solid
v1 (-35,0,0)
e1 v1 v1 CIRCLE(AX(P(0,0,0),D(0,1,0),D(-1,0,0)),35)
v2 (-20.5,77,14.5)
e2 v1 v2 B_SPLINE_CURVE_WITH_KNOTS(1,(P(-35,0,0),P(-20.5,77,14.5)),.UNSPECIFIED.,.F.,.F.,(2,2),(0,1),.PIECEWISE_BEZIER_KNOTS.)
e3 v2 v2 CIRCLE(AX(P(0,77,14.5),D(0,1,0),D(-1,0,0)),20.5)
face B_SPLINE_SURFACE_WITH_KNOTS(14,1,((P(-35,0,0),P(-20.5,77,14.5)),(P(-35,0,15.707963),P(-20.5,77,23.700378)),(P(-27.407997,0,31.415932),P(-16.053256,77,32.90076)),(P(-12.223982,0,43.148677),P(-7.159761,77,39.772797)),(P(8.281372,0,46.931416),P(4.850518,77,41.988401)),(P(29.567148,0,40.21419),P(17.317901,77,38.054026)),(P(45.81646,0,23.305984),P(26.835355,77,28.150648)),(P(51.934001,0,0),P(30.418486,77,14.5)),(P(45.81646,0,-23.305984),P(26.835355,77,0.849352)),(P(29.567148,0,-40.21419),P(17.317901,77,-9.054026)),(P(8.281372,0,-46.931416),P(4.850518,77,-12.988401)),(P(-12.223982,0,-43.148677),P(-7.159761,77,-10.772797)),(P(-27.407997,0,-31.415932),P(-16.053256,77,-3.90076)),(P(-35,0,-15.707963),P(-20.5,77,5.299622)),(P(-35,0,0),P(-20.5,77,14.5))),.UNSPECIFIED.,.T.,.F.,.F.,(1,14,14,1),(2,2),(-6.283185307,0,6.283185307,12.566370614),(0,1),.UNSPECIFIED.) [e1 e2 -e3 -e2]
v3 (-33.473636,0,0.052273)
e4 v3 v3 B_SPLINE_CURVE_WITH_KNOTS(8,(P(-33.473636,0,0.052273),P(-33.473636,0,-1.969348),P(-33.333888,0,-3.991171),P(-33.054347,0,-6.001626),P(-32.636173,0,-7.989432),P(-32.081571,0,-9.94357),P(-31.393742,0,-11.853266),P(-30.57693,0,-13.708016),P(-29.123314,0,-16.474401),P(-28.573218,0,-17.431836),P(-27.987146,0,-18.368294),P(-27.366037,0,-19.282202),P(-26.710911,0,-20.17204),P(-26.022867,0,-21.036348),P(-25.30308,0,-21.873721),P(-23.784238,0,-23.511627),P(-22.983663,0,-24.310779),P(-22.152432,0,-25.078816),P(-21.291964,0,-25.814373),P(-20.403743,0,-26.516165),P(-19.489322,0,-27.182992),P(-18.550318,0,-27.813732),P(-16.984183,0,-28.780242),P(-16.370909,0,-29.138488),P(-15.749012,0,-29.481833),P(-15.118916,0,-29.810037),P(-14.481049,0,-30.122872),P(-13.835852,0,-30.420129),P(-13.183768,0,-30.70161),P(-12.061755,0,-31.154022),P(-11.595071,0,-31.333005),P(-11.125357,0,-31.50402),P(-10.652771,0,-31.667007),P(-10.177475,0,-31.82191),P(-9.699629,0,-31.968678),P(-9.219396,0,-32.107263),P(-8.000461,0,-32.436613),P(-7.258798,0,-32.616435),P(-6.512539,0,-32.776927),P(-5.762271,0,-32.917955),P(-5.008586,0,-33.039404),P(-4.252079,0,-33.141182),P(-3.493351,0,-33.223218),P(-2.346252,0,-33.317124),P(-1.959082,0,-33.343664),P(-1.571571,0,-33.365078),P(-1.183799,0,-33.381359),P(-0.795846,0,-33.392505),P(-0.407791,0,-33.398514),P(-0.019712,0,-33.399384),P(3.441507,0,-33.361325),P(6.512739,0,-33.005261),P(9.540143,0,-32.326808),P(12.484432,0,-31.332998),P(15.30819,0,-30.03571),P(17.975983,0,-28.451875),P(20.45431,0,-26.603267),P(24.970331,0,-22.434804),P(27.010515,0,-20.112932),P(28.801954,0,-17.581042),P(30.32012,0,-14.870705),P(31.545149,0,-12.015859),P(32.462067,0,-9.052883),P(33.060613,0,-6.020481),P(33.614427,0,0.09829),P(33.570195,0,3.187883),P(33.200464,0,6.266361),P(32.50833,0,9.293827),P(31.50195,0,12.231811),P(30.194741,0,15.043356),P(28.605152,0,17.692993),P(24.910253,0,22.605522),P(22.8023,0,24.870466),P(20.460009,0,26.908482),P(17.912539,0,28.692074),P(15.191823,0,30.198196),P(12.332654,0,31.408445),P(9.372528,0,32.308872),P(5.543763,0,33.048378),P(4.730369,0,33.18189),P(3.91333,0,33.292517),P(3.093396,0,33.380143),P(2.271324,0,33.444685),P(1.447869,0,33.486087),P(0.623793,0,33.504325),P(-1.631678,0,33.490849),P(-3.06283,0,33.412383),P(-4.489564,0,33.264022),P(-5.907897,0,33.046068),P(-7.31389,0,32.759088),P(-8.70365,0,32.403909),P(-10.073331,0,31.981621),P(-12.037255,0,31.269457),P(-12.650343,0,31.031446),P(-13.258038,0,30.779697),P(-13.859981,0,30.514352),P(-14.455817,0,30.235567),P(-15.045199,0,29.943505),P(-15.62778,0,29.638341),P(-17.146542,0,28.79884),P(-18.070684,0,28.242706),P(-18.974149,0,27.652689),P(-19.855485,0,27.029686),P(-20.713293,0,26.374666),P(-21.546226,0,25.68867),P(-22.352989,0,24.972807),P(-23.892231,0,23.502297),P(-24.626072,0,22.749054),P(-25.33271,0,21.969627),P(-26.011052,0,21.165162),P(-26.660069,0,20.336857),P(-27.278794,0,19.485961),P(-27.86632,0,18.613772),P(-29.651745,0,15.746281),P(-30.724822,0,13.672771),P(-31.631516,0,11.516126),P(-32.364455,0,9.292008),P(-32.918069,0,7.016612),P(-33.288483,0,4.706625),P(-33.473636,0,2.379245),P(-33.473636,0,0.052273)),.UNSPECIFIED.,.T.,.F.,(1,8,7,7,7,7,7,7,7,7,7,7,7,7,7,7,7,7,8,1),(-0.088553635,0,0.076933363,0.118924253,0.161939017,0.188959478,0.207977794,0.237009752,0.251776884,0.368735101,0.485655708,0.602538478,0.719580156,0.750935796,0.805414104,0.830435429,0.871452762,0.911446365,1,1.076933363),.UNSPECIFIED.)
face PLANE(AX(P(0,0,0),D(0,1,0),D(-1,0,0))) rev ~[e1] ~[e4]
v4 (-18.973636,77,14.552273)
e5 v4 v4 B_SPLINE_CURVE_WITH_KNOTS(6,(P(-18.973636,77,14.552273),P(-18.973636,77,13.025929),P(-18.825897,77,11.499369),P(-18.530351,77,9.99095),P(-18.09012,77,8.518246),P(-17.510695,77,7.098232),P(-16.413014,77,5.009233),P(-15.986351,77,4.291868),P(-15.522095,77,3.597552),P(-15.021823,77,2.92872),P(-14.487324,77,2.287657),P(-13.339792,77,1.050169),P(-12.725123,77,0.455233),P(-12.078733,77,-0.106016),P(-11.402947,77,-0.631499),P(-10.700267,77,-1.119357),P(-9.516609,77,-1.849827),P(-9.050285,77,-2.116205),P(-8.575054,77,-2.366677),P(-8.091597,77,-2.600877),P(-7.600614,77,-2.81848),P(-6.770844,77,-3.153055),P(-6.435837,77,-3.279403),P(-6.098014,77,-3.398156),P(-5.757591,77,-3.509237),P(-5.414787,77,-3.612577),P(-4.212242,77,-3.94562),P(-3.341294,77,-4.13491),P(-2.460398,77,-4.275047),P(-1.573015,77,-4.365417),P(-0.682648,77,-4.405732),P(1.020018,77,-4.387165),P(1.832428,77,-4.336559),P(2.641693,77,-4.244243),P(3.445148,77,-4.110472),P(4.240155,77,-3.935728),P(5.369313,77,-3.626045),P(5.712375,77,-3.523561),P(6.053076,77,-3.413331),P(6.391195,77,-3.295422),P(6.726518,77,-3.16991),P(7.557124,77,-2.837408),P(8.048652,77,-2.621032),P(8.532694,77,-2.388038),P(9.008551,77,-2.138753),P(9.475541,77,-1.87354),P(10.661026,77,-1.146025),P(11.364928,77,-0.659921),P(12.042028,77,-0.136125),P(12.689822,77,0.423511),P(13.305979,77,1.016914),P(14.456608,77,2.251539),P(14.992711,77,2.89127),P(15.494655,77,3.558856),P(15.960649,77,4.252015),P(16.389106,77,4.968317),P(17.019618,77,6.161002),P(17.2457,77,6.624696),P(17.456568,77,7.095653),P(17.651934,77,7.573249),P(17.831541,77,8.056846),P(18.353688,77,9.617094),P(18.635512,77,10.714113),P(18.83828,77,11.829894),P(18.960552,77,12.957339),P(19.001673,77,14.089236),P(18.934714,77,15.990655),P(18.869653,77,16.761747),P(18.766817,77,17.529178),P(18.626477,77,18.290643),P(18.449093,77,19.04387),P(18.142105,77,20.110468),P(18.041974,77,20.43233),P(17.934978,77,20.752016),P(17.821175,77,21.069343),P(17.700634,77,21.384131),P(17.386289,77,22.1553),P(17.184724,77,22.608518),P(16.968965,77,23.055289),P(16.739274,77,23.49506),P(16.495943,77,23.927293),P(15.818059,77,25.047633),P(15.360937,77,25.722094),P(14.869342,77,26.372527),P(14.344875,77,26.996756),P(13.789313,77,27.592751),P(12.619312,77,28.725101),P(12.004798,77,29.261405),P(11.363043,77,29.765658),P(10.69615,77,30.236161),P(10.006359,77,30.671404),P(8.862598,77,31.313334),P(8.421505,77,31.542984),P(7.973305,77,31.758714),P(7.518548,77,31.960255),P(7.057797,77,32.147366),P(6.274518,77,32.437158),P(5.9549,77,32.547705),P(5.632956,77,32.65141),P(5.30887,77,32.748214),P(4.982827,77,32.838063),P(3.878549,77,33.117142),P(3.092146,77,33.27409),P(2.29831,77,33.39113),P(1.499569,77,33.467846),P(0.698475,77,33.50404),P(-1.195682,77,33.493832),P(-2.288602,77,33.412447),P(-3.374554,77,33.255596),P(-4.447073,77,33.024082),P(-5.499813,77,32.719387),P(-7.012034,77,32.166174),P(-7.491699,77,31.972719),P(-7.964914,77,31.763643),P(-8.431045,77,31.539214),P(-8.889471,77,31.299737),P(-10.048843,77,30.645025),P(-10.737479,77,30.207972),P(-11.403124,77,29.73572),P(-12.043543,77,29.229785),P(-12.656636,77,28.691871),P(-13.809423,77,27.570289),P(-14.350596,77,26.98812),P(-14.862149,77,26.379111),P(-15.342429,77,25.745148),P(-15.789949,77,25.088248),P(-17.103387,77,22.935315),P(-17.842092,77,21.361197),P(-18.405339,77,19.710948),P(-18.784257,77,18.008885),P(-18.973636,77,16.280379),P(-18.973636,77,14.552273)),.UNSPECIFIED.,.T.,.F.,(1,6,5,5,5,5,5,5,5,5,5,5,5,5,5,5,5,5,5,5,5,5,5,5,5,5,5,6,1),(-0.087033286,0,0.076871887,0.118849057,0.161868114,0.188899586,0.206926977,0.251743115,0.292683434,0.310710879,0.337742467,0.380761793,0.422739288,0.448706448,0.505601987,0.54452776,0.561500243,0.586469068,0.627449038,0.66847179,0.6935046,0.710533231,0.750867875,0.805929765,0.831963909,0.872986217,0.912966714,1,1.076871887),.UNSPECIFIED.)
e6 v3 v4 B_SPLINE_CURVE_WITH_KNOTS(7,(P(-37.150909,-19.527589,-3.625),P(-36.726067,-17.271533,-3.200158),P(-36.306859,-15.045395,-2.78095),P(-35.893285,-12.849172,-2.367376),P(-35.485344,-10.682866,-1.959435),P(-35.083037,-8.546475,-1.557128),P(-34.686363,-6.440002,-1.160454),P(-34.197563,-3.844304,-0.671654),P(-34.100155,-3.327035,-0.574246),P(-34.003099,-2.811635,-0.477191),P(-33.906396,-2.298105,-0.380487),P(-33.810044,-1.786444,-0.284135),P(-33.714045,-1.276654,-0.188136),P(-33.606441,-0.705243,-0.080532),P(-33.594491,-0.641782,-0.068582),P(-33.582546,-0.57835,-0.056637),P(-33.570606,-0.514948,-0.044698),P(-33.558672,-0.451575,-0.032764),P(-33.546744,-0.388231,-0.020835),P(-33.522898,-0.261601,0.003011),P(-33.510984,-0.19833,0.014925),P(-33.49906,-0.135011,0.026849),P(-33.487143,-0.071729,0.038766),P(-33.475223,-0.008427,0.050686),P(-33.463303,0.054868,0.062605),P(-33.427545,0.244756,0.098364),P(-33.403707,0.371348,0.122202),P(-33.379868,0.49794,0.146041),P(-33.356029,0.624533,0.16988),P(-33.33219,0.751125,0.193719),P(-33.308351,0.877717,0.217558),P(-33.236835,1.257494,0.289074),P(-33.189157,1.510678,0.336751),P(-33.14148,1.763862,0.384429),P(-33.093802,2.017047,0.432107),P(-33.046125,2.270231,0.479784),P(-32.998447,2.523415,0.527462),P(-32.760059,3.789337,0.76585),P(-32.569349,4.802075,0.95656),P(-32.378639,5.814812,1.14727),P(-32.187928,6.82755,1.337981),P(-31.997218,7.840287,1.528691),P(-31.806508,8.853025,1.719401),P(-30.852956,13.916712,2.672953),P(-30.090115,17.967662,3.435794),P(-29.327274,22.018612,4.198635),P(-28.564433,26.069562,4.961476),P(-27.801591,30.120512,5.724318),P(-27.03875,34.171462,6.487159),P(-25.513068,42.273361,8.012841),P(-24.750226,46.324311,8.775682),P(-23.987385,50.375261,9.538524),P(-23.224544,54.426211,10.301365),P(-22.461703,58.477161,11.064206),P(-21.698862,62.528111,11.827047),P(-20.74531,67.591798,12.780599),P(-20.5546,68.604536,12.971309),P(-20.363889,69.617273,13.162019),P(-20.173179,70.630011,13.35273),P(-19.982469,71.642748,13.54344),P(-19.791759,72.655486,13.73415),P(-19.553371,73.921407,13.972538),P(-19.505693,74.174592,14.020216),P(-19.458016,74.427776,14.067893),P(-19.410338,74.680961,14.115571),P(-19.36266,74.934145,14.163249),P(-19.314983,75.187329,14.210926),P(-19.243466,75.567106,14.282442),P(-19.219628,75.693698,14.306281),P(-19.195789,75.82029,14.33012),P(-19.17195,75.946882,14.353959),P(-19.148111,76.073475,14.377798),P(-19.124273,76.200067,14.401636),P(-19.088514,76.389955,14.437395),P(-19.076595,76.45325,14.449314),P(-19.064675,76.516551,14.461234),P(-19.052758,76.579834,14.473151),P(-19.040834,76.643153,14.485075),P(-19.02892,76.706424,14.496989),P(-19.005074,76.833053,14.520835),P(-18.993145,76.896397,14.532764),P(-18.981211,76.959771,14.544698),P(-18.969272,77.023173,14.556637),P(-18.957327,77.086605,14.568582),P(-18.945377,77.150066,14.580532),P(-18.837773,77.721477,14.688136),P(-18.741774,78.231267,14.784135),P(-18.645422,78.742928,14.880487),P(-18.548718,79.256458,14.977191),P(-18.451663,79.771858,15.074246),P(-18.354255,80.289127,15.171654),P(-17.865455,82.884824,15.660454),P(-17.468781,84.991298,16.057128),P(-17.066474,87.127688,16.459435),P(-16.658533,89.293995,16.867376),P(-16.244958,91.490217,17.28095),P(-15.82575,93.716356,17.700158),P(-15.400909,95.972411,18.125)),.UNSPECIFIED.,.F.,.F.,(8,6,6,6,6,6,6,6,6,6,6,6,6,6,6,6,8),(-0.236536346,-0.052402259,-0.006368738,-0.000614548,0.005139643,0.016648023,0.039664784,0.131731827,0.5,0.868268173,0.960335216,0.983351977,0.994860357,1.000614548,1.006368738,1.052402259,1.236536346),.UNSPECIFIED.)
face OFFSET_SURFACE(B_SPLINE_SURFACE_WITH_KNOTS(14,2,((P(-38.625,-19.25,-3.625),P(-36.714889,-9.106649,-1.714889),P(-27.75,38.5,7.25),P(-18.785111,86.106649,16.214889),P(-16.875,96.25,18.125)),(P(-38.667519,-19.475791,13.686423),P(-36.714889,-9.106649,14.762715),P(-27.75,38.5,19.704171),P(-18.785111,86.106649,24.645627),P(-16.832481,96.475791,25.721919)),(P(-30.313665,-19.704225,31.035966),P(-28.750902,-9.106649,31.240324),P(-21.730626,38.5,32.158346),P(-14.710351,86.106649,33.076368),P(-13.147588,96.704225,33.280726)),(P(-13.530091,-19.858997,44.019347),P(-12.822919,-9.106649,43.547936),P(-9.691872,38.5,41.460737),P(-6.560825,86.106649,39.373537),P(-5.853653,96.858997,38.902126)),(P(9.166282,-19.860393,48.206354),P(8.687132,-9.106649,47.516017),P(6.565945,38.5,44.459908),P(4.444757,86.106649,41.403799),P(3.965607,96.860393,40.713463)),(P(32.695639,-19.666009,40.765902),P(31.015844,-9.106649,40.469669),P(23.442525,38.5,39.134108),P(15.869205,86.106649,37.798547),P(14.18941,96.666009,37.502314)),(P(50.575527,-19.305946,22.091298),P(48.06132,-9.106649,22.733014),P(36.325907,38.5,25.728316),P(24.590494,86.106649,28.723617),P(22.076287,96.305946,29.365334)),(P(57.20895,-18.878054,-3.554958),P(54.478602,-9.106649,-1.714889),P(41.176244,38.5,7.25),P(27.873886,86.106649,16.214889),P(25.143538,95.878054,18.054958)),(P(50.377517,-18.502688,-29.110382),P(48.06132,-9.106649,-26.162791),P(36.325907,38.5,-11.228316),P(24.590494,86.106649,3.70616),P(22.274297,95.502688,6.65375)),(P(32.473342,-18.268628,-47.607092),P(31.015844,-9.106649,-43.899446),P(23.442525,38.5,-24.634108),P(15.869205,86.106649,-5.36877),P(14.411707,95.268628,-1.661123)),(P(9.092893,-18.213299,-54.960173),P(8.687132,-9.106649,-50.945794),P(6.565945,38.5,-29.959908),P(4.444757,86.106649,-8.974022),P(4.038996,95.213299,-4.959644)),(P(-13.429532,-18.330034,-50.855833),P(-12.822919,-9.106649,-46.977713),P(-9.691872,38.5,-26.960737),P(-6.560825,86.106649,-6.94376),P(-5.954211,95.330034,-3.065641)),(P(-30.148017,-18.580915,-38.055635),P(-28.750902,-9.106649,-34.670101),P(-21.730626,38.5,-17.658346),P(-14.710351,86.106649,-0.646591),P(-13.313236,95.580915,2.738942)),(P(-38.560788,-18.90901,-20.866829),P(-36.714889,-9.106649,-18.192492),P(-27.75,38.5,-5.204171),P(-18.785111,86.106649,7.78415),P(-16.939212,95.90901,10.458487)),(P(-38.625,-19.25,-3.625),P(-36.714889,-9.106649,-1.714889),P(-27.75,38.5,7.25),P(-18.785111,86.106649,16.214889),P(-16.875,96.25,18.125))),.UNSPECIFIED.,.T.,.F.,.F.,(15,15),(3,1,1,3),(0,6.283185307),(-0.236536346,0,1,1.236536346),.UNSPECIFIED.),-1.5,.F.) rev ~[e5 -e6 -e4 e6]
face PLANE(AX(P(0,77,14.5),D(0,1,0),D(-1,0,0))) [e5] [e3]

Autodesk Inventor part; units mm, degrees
ref_plane "YZ Plane" through (0, 0, 0) normal (1, 0, 0) x (0, 1, 0)
ref_plane "XY Plane" through (0, 0, 0) normal (0, 0, 1) x (1, 0, 0)
sketch "Szkic6" plane through (0, 0, 0) normal (0, 1, 0) x (-1, 0, 0)
  circle A0 centre (0, 0) radius 35
  dimension "d33" = 70
ref_plane "Płaszczyzna konstrukcyjna1" through (0, 77, 0) normal (0, 1, 0) x (-1, 0, 0)
sketch "Szkic7" plane through (0, 77, 0) normal (0, 1, 0) x (-1, 0, 0)
  circle A0 centre (0, 14.5) radius 20.5
  line L0 (0, -20.3) -> (0, 20.3) construction
  circle A1 centre (0, 0) radius 35 construction
  dimension "d35" = 41
loft "Wyciągnięcie złożone1" add profiles "Szkic6", "Szkic7"
shell "Skorupa1" thickness 1.5 removed faces 2 at (4.592, 77, 16.9101) at (1.9985, 0, 11.019)
equation "\"d33\" = OD1"
equation "\"d35\" = OD2"
equation "\"d52\" = THK"
equation "\"SzerokośćGięciaPodcięcia\" = Grubość"
equation "\"RozmiarPodcięciaNarożnika\" = 4 * Grubość"
equation "\"PromieńPrzejścia\" = PromieńGięcia"
equation "\"Rozmiar_promienia_Jacobiego\" = PromieńGięcia"
equation "\"Wielk_odstępu\" = Grubość"
equation "\"d2\" = PromieńGięcia"
equation "\"d23\" = PromieńGięcia"
equation "\"OD1\" = 70"
equation "\"OD2\" = 41"
equation "\"L\" = 77"
equation "\"THK\" = 1.5"
equation "\"d34\" = L"
equation "\"Grubość\" = 1.5"
equation "\"PromieńGięcia\" = 3"
properties part number "Redukcja asymetryczna Ø70x41x1,5 L=77" material "304"
